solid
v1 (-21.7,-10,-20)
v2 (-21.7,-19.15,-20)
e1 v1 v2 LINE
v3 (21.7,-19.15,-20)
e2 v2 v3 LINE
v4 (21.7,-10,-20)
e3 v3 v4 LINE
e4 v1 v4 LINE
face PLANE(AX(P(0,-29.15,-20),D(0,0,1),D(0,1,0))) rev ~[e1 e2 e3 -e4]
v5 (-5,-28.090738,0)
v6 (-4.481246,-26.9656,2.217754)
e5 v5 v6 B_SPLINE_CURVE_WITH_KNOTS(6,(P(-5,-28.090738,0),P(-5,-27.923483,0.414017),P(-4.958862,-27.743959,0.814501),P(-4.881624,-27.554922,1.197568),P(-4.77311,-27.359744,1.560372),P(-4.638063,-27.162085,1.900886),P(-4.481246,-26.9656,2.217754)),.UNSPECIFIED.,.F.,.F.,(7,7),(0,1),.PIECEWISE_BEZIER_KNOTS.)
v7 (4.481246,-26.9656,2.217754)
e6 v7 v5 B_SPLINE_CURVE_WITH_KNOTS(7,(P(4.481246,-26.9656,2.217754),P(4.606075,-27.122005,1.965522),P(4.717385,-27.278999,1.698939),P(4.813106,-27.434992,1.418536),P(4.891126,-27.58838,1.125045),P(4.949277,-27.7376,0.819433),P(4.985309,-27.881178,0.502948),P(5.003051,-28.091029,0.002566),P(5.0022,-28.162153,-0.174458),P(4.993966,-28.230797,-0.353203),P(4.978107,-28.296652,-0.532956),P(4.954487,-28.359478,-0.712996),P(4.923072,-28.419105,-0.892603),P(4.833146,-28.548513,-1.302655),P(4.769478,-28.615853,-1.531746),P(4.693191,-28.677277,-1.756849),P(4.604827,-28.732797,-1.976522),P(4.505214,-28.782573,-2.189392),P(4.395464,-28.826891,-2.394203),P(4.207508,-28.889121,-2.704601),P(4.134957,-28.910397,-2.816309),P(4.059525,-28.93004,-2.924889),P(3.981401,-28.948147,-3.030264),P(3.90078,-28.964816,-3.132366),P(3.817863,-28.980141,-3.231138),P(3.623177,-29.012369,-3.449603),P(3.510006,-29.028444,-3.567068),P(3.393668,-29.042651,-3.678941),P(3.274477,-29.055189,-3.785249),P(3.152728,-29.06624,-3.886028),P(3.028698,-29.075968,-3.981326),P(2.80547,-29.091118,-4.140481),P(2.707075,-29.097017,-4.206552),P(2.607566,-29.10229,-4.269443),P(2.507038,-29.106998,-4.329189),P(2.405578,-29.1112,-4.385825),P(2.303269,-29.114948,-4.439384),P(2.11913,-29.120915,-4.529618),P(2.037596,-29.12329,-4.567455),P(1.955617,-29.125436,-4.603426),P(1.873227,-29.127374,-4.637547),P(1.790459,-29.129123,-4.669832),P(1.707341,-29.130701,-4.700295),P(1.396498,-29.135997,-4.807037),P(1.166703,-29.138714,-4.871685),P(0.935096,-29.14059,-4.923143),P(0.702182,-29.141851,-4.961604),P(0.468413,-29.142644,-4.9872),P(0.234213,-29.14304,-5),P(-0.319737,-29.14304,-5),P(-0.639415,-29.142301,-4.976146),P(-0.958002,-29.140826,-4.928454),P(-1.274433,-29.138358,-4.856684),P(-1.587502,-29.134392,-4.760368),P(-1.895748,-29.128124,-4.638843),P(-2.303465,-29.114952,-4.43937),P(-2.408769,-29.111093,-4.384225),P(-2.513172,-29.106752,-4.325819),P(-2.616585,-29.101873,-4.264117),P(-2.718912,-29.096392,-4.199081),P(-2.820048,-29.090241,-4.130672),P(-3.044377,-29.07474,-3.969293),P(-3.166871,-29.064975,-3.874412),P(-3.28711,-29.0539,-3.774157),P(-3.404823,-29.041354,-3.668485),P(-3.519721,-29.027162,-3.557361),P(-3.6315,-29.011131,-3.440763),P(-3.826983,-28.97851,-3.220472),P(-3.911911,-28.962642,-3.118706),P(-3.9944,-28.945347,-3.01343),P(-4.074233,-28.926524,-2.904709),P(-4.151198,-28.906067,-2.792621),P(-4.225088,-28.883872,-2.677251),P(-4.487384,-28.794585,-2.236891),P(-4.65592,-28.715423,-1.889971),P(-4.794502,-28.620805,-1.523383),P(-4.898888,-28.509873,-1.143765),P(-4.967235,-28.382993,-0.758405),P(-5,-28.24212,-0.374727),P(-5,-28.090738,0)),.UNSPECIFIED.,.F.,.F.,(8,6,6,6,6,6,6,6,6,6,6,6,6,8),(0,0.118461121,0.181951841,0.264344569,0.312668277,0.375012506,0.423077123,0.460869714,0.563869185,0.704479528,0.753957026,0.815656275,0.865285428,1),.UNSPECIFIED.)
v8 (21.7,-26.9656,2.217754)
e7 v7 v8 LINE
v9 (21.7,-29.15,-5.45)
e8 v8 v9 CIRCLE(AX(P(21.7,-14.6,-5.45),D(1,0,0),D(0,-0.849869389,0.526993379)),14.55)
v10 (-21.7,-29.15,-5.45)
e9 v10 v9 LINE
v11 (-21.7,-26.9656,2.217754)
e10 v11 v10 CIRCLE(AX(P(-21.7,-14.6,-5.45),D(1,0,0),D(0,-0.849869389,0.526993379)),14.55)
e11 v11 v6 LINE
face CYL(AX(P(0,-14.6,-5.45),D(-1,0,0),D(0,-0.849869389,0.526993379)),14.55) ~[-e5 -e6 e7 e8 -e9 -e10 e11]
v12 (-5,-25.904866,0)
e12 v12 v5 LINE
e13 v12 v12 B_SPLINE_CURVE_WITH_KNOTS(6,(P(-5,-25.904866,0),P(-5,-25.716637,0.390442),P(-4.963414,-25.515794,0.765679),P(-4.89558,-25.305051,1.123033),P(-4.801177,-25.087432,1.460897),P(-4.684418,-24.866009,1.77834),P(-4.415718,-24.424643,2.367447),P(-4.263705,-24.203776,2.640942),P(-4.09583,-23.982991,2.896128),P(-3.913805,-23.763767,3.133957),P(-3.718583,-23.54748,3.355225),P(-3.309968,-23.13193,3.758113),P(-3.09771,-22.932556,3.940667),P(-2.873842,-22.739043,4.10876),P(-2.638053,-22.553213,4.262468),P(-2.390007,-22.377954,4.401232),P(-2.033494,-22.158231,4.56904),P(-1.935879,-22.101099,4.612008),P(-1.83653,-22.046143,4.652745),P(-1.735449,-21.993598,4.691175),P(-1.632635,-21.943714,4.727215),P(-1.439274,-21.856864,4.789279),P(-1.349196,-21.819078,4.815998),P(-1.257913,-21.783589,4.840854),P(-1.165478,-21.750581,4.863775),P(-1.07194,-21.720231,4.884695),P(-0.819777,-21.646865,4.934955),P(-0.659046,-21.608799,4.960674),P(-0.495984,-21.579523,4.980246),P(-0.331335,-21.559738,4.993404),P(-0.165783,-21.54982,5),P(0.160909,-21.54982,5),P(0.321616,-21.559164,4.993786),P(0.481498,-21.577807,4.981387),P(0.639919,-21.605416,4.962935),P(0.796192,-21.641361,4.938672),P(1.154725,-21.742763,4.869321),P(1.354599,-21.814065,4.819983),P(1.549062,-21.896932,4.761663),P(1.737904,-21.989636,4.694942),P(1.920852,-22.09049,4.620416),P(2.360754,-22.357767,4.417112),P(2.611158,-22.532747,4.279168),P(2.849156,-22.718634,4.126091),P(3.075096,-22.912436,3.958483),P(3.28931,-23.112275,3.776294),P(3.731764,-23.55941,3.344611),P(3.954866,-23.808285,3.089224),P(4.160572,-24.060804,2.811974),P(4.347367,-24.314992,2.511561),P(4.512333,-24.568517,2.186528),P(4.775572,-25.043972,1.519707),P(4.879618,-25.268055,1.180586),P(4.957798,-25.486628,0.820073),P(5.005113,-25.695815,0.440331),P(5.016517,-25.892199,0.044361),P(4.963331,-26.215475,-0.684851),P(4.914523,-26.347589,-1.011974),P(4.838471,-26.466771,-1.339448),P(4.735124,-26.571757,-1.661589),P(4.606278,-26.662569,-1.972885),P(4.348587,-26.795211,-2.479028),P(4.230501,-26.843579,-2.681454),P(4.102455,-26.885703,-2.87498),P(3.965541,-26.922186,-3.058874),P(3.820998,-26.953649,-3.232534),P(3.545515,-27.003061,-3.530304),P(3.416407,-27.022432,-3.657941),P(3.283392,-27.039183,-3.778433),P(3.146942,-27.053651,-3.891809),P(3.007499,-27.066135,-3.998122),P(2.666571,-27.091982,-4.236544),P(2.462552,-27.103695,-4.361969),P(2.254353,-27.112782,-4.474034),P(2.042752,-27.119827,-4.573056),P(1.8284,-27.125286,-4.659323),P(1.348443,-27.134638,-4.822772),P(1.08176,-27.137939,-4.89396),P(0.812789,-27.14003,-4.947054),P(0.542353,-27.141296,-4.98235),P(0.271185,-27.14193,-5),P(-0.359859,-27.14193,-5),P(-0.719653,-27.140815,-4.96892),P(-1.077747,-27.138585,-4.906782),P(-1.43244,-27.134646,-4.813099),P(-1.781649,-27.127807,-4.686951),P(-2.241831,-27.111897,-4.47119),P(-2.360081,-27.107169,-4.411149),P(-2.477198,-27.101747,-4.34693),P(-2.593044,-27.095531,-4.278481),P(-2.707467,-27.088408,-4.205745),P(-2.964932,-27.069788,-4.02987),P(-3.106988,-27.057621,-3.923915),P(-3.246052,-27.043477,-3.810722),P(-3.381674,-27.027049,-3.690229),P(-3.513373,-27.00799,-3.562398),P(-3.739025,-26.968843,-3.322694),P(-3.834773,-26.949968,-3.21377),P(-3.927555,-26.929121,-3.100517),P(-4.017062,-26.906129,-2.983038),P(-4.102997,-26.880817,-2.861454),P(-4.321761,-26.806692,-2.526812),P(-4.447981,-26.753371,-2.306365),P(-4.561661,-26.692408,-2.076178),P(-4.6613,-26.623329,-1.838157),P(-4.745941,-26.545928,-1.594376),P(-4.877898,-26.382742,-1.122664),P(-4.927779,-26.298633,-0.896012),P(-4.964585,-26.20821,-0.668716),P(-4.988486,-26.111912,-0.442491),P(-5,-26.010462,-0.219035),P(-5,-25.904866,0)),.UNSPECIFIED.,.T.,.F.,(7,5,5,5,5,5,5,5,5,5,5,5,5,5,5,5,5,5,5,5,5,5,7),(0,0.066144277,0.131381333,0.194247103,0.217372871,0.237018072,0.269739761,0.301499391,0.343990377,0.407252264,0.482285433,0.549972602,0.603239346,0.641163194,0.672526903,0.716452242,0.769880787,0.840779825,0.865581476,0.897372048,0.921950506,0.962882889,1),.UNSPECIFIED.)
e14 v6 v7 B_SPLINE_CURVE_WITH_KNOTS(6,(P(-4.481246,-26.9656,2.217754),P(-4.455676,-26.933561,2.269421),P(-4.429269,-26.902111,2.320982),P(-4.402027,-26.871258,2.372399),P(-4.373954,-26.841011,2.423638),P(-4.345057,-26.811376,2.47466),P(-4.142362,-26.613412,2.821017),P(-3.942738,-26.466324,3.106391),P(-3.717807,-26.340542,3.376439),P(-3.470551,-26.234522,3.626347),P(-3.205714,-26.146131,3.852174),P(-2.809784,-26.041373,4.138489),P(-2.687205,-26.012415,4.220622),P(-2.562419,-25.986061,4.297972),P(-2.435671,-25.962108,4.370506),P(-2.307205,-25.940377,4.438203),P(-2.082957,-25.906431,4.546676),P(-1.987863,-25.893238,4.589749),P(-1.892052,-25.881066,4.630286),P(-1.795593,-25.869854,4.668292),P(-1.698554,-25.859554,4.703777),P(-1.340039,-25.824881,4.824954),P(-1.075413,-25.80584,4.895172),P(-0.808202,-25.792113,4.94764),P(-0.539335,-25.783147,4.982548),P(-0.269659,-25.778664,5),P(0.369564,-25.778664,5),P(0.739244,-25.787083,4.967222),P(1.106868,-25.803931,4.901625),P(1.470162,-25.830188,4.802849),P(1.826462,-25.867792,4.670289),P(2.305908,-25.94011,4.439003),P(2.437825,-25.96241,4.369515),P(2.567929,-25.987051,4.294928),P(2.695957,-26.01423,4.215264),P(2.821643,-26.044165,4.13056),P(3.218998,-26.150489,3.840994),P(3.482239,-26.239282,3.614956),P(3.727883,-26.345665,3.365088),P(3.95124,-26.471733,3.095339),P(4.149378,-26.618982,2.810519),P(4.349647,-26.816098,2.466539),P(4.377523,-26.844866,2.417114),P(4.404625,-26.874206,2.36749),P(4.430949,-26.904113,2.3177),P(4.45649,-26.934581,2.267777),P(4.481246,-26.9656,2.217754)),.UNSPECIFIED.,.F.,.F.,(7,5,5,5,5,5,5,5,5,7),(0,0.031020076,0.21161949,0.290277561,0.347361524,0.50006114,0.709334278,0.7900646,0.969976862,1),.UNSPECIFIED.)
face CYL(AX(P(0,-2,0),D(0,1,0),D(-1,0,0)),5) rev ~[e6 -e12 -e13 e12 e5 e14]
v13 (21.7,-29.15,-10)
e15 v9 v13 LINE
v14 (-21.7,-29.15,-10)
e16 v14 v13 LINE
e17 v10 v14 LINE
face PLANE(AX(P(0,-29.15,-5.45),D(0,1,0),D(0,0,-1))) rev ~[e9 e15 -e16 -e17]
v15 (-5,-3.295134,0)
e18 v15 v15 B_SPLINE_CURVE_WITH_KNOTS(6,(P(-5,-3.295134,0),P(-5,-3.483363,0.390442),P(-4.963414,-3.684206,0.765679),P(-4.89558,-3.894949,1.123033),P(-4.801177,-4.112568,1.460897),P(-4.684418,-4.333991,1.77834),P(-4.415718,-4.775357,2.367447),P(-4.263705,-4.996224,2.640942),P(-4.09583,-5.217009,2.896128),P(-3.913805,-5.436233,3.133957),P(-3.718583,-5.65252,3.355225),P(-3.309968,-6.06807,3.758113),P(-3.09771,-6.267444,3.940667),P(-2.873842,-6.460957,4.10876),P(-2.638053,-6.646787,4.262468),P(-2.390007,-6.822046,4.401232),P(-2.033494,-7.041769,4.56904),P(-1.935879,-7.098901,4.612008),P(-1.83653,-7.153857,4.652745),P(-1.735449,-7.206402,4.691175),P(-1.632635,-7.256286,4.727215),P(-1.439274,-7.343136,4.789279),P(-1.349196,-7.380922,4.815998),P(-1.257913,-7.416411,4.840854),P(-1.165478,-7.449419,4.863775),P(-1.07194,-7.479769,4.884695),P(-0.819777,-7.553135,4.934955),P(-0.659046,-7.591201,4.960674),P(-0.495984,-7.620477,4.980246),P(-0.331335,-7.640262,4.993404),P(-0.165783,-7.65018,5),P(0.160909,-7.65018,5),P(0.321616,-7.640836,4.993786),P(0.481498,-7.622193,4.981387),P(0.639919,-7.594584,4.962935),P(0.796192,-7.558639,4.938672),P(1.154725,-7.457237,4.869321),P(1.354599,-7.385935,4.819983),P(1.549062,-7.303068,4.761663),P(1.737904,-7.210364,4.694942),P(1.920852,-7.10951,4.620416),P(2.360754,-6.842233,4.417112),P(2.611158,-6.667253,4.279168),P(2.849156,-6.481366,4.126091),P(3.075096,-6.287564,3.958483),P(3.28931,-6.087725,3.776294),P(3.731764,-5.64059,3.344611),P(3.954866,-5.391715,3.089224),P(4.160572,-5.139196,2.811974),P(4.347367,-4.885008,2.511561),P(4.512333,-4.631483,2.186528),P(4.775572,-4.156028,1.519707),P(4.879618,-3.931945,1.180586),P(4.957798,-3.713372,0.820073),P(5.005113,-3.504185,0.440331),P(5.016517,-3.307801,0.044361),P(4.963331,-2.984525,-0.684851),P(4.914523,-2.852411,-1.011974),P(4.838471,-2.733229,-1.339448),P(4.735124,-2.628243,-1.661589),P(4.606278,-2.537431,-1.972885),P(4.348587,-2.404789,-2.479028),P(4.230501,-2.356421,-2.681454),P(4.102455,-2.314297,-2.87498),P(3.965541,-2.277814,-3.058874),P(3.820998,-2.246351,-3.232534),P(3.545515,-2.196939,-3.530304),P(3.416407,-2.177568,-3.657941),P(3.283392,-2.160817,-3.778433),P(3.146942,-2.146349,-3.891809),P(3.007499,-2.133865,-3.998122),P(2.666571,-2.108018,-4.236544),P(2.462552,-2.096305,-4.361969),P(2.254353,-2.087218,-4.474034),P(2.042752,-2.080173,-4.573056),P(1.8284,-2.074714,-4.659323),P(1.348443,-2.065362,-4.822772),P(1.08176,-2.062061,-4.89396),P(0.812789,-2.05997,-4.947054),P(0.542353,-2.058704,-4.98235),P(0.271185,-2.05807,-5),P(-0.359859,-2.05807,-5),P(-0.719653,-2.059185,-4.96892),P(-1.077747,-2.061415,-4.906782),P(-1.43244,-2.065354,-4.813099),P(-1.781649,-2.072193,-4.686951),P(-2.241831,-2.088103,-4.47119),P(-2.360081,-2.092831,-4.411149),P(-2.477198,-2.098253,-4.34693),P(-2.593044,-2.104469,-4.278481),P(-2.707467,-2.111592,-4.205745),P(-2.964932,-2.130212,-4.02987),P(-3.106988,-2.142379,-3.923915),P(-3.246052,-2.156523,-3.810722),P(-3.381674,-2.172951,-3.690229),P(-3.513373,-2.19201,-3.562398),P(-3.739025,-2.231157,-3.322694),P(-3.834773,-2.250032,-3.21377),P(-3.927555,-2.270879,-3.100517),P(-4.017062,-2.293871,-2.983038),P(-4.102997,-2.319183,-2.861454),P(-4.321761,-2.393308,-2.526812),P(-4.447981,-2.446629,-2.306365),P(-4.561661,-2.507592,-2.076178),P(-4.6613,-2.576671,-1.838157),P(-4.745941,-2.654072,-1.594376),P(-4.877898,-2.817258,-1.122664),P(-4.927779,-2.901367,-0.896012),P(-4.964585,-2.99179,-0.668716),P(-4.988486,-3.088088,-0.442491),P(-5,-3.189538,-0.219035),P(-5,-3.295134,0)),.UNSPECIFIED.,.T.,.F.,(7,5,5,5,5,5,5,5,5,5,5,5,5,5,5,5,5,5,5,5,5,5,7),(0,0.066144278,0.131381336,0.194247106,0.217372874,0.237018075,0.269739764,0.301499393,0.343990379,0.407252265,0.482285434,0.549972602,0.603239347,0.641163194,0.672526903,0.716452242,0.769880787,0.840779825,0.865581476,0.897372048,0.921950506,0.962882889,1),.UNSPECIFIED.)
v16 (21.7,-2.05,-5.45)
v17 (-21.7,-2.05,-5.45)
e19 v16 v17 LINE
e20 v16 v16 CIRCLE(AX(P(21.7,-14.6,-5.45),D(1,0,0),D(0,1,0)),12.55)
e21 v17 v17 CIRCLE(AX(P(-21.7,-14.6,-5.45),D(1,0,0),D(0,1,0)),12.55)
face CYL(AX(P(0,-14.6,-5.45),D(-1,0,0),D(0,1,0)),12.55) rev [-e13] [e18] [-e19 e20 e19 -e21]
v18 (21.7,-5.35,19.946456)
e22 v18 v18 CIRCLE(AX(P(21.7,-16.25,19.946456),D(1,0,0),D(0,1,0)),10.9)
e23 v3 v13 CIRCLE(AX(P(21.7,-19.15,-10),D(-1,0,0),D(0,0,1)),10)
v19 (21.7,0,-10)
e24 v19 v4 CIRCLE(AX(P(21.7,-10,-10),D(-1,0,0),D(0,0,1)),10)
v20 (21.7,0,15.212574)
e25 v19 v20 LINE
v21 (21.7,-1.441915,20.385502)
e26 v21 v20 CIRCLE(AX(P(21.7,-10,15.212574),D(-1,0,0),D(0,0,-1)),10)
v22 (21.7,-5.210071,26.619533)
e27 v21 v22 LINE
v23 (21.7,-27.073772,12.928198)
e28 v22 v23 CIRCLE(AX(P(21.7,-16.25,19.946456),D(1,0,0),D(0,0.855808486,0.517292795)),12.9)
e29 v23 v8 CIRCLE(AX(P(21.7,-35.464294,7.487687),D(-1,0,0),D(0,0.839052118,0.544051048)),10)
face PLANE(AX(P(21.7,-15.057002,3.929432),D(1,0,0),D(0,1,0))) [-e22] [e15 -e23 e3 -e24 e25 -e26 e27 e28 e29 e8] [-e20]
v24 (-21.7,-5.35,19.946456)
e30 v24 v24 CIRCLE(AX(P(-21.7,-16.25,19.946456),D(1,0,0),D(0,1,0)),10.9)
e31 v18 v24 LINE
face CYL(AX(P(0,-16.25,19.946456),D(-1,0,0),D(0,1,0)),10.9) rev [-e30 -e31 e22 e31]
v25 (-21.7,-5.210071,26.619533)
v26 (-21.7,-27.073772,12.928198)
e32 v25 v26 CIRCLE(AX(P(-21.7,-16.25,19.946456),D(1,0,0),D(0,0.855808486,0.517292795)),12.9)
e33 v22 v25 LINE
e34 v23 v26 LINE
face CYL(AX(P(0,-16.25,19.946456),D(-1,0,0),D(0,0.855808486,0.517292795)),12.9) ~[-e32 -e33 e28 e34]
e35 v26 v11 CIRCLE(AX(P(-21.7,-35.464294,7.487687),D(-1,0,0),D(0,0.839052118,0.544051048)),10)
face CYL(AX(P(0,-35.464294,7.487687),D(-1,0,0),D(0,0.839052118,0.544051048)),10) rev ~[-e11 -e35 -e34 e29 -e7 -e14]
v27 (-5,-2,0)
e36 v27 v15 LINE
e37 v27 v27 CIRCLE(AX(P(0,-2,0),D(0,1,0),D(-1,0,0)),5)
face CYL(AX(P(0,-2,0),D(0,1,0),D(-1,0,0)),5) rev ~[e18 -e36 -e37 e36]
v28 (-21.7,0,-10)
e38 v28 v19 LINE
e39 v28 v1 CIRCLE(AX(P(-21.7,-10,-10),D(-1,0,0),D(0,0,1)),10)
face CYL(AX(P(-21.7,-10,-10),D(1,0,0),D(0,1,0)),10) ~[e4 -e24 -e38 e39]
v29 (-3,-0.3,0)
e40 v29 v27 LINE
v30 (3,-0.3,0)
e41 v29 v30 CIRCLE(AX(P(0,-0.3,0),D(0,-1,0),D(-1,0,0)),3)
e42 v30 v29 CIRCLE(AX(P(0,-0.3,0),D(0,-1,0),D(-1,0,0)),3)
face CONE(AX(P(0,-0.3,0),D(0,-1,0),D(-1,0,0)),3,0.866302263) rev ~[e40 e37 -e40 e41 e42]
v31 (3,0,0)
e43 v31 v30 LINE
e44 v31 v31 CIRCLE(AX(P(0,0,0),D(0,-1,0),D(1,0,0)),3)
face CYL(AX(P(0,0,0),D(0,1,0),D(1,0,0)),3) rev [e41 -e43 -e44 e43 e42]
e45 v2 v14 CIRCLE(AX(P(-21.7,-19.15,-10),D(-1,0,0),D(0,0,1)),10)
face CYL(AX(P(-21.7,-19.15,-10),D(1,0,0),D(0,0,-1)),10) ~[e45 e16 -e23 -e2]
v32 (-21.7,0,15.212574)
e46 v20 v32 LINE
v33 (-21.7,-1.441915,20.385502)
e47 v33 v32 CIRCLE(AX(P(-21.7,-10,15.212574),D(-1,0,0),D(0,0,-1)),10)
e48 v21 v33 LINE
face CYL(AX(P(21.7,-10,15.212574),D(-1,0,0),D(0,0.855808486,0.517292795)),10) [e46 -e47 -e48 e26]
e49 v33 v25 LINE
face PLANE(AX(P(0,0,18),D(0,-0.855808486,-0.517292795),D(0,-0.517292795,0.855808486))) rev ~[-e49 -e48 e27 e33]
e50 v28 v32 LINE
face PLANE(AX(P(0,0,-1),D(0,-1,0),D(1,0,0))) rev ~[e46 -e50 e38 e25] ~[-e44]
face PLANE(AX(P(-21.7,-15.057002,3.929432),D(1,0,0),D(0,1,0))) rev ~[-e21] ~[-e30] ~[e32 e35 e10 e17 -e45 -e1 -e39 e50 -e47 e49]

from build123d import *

# Parameters (mm, degrees)
F0_W          = 43.4
F0_H          = 38
F0_R          = 3
F1_DEPTH      = 2
F2_R          = 12.55
F2_R_2        = 10.9
F3_DEPTH      = 21.7
F3_DEPTH_BACK = 21.7
F4_R          = 5
F5_DEPTH      = 27.151
F8_R          = 10


# Not quite as in the source:
# - a feature names something its author has since deleted; it is built from what else it names


with BuildPart() as f1:
    # F0 (on Front) → F1 (new body)
    with BuildSketch(Plane.XZ):
        with Locations((0, -1)):
            Rectangle(F0_W, F0_H)
        Circle(F0_R, mode=Mode.SUBTRACT)
    extrude(amount=F1_DEPTH)

    # F2 (on Right) → F3 (join, two sides)
    with BuildSketch(Plane.YZ) as f3_sk:
        with BuildLine():
            ThreePointArc((-27.0737723252, 12.9281979258), (-25.4648034923, 7.5886797024), (-26.9655996144, 2.217753659))
            ThreePointArc((-26.9655996144, 2.217753659), (-28.5932479144, -1.4635839649), (-29.15, -5.45))
            Line((-29.15, -5.45), (-29.15, -20))
            Line((-29.15, -20), (-2, -20))
            Line((-2, -20), (-2, 18))
            Line((-2, 18), (0, 18))
            Line((0, 18), (-5.2100705327, 26.6195334989))
            ThreePointArc((-5.2100705327, 26.6195334989), (-23.0965208991, 30.8796696778), (-27.0737723252, 12.9281979258))
        make_face()
        with Locations((-14.6, -5.45)):
            Circle(F2_R, mode=Mode.SUBTRACT)
        with Locations((-16.25, 19.9464564457)):
            Circle(F2_R_2, mode=Mode.SUBTRACT)
    extrude(amount=-F3_DEPTH)
    extrude(f3_sk.sketch, amount=F3_DEPTH_BACK)

    # F4 (on face) → F5 (cut, through all)
    with BuildSketch(Plane(origin=(0, -2, 0), x_dir=(-1, 0, 0), z_dir=(0, 1, 0))):
        Circle(F4_R)
    extrude(amount=-F5_DEPTH, mode=Mode.SUBTRACT)

    # F6 (on Top) → F7 (revolve, cut)
    with BuildSketch(Plane.XY):
        Polygon((0, -2), (0, 0), (-3, 0), (-3, -0.3), (-5, -2), align=None)
    revolve(axis=Axis((0, -1, 0), (0, -1, 0)), mode=Mode.SUBTRACT)

    # F8
    f8_edges = [f1.edges().sort_by_distance(p)[0] for p in [
        (0, 0, -20),
        (0, 0, 18),
        (0, -29.15, -20),
    ]]
    fillet(f8_edges, radius=F8_R)


solid = f1.part
